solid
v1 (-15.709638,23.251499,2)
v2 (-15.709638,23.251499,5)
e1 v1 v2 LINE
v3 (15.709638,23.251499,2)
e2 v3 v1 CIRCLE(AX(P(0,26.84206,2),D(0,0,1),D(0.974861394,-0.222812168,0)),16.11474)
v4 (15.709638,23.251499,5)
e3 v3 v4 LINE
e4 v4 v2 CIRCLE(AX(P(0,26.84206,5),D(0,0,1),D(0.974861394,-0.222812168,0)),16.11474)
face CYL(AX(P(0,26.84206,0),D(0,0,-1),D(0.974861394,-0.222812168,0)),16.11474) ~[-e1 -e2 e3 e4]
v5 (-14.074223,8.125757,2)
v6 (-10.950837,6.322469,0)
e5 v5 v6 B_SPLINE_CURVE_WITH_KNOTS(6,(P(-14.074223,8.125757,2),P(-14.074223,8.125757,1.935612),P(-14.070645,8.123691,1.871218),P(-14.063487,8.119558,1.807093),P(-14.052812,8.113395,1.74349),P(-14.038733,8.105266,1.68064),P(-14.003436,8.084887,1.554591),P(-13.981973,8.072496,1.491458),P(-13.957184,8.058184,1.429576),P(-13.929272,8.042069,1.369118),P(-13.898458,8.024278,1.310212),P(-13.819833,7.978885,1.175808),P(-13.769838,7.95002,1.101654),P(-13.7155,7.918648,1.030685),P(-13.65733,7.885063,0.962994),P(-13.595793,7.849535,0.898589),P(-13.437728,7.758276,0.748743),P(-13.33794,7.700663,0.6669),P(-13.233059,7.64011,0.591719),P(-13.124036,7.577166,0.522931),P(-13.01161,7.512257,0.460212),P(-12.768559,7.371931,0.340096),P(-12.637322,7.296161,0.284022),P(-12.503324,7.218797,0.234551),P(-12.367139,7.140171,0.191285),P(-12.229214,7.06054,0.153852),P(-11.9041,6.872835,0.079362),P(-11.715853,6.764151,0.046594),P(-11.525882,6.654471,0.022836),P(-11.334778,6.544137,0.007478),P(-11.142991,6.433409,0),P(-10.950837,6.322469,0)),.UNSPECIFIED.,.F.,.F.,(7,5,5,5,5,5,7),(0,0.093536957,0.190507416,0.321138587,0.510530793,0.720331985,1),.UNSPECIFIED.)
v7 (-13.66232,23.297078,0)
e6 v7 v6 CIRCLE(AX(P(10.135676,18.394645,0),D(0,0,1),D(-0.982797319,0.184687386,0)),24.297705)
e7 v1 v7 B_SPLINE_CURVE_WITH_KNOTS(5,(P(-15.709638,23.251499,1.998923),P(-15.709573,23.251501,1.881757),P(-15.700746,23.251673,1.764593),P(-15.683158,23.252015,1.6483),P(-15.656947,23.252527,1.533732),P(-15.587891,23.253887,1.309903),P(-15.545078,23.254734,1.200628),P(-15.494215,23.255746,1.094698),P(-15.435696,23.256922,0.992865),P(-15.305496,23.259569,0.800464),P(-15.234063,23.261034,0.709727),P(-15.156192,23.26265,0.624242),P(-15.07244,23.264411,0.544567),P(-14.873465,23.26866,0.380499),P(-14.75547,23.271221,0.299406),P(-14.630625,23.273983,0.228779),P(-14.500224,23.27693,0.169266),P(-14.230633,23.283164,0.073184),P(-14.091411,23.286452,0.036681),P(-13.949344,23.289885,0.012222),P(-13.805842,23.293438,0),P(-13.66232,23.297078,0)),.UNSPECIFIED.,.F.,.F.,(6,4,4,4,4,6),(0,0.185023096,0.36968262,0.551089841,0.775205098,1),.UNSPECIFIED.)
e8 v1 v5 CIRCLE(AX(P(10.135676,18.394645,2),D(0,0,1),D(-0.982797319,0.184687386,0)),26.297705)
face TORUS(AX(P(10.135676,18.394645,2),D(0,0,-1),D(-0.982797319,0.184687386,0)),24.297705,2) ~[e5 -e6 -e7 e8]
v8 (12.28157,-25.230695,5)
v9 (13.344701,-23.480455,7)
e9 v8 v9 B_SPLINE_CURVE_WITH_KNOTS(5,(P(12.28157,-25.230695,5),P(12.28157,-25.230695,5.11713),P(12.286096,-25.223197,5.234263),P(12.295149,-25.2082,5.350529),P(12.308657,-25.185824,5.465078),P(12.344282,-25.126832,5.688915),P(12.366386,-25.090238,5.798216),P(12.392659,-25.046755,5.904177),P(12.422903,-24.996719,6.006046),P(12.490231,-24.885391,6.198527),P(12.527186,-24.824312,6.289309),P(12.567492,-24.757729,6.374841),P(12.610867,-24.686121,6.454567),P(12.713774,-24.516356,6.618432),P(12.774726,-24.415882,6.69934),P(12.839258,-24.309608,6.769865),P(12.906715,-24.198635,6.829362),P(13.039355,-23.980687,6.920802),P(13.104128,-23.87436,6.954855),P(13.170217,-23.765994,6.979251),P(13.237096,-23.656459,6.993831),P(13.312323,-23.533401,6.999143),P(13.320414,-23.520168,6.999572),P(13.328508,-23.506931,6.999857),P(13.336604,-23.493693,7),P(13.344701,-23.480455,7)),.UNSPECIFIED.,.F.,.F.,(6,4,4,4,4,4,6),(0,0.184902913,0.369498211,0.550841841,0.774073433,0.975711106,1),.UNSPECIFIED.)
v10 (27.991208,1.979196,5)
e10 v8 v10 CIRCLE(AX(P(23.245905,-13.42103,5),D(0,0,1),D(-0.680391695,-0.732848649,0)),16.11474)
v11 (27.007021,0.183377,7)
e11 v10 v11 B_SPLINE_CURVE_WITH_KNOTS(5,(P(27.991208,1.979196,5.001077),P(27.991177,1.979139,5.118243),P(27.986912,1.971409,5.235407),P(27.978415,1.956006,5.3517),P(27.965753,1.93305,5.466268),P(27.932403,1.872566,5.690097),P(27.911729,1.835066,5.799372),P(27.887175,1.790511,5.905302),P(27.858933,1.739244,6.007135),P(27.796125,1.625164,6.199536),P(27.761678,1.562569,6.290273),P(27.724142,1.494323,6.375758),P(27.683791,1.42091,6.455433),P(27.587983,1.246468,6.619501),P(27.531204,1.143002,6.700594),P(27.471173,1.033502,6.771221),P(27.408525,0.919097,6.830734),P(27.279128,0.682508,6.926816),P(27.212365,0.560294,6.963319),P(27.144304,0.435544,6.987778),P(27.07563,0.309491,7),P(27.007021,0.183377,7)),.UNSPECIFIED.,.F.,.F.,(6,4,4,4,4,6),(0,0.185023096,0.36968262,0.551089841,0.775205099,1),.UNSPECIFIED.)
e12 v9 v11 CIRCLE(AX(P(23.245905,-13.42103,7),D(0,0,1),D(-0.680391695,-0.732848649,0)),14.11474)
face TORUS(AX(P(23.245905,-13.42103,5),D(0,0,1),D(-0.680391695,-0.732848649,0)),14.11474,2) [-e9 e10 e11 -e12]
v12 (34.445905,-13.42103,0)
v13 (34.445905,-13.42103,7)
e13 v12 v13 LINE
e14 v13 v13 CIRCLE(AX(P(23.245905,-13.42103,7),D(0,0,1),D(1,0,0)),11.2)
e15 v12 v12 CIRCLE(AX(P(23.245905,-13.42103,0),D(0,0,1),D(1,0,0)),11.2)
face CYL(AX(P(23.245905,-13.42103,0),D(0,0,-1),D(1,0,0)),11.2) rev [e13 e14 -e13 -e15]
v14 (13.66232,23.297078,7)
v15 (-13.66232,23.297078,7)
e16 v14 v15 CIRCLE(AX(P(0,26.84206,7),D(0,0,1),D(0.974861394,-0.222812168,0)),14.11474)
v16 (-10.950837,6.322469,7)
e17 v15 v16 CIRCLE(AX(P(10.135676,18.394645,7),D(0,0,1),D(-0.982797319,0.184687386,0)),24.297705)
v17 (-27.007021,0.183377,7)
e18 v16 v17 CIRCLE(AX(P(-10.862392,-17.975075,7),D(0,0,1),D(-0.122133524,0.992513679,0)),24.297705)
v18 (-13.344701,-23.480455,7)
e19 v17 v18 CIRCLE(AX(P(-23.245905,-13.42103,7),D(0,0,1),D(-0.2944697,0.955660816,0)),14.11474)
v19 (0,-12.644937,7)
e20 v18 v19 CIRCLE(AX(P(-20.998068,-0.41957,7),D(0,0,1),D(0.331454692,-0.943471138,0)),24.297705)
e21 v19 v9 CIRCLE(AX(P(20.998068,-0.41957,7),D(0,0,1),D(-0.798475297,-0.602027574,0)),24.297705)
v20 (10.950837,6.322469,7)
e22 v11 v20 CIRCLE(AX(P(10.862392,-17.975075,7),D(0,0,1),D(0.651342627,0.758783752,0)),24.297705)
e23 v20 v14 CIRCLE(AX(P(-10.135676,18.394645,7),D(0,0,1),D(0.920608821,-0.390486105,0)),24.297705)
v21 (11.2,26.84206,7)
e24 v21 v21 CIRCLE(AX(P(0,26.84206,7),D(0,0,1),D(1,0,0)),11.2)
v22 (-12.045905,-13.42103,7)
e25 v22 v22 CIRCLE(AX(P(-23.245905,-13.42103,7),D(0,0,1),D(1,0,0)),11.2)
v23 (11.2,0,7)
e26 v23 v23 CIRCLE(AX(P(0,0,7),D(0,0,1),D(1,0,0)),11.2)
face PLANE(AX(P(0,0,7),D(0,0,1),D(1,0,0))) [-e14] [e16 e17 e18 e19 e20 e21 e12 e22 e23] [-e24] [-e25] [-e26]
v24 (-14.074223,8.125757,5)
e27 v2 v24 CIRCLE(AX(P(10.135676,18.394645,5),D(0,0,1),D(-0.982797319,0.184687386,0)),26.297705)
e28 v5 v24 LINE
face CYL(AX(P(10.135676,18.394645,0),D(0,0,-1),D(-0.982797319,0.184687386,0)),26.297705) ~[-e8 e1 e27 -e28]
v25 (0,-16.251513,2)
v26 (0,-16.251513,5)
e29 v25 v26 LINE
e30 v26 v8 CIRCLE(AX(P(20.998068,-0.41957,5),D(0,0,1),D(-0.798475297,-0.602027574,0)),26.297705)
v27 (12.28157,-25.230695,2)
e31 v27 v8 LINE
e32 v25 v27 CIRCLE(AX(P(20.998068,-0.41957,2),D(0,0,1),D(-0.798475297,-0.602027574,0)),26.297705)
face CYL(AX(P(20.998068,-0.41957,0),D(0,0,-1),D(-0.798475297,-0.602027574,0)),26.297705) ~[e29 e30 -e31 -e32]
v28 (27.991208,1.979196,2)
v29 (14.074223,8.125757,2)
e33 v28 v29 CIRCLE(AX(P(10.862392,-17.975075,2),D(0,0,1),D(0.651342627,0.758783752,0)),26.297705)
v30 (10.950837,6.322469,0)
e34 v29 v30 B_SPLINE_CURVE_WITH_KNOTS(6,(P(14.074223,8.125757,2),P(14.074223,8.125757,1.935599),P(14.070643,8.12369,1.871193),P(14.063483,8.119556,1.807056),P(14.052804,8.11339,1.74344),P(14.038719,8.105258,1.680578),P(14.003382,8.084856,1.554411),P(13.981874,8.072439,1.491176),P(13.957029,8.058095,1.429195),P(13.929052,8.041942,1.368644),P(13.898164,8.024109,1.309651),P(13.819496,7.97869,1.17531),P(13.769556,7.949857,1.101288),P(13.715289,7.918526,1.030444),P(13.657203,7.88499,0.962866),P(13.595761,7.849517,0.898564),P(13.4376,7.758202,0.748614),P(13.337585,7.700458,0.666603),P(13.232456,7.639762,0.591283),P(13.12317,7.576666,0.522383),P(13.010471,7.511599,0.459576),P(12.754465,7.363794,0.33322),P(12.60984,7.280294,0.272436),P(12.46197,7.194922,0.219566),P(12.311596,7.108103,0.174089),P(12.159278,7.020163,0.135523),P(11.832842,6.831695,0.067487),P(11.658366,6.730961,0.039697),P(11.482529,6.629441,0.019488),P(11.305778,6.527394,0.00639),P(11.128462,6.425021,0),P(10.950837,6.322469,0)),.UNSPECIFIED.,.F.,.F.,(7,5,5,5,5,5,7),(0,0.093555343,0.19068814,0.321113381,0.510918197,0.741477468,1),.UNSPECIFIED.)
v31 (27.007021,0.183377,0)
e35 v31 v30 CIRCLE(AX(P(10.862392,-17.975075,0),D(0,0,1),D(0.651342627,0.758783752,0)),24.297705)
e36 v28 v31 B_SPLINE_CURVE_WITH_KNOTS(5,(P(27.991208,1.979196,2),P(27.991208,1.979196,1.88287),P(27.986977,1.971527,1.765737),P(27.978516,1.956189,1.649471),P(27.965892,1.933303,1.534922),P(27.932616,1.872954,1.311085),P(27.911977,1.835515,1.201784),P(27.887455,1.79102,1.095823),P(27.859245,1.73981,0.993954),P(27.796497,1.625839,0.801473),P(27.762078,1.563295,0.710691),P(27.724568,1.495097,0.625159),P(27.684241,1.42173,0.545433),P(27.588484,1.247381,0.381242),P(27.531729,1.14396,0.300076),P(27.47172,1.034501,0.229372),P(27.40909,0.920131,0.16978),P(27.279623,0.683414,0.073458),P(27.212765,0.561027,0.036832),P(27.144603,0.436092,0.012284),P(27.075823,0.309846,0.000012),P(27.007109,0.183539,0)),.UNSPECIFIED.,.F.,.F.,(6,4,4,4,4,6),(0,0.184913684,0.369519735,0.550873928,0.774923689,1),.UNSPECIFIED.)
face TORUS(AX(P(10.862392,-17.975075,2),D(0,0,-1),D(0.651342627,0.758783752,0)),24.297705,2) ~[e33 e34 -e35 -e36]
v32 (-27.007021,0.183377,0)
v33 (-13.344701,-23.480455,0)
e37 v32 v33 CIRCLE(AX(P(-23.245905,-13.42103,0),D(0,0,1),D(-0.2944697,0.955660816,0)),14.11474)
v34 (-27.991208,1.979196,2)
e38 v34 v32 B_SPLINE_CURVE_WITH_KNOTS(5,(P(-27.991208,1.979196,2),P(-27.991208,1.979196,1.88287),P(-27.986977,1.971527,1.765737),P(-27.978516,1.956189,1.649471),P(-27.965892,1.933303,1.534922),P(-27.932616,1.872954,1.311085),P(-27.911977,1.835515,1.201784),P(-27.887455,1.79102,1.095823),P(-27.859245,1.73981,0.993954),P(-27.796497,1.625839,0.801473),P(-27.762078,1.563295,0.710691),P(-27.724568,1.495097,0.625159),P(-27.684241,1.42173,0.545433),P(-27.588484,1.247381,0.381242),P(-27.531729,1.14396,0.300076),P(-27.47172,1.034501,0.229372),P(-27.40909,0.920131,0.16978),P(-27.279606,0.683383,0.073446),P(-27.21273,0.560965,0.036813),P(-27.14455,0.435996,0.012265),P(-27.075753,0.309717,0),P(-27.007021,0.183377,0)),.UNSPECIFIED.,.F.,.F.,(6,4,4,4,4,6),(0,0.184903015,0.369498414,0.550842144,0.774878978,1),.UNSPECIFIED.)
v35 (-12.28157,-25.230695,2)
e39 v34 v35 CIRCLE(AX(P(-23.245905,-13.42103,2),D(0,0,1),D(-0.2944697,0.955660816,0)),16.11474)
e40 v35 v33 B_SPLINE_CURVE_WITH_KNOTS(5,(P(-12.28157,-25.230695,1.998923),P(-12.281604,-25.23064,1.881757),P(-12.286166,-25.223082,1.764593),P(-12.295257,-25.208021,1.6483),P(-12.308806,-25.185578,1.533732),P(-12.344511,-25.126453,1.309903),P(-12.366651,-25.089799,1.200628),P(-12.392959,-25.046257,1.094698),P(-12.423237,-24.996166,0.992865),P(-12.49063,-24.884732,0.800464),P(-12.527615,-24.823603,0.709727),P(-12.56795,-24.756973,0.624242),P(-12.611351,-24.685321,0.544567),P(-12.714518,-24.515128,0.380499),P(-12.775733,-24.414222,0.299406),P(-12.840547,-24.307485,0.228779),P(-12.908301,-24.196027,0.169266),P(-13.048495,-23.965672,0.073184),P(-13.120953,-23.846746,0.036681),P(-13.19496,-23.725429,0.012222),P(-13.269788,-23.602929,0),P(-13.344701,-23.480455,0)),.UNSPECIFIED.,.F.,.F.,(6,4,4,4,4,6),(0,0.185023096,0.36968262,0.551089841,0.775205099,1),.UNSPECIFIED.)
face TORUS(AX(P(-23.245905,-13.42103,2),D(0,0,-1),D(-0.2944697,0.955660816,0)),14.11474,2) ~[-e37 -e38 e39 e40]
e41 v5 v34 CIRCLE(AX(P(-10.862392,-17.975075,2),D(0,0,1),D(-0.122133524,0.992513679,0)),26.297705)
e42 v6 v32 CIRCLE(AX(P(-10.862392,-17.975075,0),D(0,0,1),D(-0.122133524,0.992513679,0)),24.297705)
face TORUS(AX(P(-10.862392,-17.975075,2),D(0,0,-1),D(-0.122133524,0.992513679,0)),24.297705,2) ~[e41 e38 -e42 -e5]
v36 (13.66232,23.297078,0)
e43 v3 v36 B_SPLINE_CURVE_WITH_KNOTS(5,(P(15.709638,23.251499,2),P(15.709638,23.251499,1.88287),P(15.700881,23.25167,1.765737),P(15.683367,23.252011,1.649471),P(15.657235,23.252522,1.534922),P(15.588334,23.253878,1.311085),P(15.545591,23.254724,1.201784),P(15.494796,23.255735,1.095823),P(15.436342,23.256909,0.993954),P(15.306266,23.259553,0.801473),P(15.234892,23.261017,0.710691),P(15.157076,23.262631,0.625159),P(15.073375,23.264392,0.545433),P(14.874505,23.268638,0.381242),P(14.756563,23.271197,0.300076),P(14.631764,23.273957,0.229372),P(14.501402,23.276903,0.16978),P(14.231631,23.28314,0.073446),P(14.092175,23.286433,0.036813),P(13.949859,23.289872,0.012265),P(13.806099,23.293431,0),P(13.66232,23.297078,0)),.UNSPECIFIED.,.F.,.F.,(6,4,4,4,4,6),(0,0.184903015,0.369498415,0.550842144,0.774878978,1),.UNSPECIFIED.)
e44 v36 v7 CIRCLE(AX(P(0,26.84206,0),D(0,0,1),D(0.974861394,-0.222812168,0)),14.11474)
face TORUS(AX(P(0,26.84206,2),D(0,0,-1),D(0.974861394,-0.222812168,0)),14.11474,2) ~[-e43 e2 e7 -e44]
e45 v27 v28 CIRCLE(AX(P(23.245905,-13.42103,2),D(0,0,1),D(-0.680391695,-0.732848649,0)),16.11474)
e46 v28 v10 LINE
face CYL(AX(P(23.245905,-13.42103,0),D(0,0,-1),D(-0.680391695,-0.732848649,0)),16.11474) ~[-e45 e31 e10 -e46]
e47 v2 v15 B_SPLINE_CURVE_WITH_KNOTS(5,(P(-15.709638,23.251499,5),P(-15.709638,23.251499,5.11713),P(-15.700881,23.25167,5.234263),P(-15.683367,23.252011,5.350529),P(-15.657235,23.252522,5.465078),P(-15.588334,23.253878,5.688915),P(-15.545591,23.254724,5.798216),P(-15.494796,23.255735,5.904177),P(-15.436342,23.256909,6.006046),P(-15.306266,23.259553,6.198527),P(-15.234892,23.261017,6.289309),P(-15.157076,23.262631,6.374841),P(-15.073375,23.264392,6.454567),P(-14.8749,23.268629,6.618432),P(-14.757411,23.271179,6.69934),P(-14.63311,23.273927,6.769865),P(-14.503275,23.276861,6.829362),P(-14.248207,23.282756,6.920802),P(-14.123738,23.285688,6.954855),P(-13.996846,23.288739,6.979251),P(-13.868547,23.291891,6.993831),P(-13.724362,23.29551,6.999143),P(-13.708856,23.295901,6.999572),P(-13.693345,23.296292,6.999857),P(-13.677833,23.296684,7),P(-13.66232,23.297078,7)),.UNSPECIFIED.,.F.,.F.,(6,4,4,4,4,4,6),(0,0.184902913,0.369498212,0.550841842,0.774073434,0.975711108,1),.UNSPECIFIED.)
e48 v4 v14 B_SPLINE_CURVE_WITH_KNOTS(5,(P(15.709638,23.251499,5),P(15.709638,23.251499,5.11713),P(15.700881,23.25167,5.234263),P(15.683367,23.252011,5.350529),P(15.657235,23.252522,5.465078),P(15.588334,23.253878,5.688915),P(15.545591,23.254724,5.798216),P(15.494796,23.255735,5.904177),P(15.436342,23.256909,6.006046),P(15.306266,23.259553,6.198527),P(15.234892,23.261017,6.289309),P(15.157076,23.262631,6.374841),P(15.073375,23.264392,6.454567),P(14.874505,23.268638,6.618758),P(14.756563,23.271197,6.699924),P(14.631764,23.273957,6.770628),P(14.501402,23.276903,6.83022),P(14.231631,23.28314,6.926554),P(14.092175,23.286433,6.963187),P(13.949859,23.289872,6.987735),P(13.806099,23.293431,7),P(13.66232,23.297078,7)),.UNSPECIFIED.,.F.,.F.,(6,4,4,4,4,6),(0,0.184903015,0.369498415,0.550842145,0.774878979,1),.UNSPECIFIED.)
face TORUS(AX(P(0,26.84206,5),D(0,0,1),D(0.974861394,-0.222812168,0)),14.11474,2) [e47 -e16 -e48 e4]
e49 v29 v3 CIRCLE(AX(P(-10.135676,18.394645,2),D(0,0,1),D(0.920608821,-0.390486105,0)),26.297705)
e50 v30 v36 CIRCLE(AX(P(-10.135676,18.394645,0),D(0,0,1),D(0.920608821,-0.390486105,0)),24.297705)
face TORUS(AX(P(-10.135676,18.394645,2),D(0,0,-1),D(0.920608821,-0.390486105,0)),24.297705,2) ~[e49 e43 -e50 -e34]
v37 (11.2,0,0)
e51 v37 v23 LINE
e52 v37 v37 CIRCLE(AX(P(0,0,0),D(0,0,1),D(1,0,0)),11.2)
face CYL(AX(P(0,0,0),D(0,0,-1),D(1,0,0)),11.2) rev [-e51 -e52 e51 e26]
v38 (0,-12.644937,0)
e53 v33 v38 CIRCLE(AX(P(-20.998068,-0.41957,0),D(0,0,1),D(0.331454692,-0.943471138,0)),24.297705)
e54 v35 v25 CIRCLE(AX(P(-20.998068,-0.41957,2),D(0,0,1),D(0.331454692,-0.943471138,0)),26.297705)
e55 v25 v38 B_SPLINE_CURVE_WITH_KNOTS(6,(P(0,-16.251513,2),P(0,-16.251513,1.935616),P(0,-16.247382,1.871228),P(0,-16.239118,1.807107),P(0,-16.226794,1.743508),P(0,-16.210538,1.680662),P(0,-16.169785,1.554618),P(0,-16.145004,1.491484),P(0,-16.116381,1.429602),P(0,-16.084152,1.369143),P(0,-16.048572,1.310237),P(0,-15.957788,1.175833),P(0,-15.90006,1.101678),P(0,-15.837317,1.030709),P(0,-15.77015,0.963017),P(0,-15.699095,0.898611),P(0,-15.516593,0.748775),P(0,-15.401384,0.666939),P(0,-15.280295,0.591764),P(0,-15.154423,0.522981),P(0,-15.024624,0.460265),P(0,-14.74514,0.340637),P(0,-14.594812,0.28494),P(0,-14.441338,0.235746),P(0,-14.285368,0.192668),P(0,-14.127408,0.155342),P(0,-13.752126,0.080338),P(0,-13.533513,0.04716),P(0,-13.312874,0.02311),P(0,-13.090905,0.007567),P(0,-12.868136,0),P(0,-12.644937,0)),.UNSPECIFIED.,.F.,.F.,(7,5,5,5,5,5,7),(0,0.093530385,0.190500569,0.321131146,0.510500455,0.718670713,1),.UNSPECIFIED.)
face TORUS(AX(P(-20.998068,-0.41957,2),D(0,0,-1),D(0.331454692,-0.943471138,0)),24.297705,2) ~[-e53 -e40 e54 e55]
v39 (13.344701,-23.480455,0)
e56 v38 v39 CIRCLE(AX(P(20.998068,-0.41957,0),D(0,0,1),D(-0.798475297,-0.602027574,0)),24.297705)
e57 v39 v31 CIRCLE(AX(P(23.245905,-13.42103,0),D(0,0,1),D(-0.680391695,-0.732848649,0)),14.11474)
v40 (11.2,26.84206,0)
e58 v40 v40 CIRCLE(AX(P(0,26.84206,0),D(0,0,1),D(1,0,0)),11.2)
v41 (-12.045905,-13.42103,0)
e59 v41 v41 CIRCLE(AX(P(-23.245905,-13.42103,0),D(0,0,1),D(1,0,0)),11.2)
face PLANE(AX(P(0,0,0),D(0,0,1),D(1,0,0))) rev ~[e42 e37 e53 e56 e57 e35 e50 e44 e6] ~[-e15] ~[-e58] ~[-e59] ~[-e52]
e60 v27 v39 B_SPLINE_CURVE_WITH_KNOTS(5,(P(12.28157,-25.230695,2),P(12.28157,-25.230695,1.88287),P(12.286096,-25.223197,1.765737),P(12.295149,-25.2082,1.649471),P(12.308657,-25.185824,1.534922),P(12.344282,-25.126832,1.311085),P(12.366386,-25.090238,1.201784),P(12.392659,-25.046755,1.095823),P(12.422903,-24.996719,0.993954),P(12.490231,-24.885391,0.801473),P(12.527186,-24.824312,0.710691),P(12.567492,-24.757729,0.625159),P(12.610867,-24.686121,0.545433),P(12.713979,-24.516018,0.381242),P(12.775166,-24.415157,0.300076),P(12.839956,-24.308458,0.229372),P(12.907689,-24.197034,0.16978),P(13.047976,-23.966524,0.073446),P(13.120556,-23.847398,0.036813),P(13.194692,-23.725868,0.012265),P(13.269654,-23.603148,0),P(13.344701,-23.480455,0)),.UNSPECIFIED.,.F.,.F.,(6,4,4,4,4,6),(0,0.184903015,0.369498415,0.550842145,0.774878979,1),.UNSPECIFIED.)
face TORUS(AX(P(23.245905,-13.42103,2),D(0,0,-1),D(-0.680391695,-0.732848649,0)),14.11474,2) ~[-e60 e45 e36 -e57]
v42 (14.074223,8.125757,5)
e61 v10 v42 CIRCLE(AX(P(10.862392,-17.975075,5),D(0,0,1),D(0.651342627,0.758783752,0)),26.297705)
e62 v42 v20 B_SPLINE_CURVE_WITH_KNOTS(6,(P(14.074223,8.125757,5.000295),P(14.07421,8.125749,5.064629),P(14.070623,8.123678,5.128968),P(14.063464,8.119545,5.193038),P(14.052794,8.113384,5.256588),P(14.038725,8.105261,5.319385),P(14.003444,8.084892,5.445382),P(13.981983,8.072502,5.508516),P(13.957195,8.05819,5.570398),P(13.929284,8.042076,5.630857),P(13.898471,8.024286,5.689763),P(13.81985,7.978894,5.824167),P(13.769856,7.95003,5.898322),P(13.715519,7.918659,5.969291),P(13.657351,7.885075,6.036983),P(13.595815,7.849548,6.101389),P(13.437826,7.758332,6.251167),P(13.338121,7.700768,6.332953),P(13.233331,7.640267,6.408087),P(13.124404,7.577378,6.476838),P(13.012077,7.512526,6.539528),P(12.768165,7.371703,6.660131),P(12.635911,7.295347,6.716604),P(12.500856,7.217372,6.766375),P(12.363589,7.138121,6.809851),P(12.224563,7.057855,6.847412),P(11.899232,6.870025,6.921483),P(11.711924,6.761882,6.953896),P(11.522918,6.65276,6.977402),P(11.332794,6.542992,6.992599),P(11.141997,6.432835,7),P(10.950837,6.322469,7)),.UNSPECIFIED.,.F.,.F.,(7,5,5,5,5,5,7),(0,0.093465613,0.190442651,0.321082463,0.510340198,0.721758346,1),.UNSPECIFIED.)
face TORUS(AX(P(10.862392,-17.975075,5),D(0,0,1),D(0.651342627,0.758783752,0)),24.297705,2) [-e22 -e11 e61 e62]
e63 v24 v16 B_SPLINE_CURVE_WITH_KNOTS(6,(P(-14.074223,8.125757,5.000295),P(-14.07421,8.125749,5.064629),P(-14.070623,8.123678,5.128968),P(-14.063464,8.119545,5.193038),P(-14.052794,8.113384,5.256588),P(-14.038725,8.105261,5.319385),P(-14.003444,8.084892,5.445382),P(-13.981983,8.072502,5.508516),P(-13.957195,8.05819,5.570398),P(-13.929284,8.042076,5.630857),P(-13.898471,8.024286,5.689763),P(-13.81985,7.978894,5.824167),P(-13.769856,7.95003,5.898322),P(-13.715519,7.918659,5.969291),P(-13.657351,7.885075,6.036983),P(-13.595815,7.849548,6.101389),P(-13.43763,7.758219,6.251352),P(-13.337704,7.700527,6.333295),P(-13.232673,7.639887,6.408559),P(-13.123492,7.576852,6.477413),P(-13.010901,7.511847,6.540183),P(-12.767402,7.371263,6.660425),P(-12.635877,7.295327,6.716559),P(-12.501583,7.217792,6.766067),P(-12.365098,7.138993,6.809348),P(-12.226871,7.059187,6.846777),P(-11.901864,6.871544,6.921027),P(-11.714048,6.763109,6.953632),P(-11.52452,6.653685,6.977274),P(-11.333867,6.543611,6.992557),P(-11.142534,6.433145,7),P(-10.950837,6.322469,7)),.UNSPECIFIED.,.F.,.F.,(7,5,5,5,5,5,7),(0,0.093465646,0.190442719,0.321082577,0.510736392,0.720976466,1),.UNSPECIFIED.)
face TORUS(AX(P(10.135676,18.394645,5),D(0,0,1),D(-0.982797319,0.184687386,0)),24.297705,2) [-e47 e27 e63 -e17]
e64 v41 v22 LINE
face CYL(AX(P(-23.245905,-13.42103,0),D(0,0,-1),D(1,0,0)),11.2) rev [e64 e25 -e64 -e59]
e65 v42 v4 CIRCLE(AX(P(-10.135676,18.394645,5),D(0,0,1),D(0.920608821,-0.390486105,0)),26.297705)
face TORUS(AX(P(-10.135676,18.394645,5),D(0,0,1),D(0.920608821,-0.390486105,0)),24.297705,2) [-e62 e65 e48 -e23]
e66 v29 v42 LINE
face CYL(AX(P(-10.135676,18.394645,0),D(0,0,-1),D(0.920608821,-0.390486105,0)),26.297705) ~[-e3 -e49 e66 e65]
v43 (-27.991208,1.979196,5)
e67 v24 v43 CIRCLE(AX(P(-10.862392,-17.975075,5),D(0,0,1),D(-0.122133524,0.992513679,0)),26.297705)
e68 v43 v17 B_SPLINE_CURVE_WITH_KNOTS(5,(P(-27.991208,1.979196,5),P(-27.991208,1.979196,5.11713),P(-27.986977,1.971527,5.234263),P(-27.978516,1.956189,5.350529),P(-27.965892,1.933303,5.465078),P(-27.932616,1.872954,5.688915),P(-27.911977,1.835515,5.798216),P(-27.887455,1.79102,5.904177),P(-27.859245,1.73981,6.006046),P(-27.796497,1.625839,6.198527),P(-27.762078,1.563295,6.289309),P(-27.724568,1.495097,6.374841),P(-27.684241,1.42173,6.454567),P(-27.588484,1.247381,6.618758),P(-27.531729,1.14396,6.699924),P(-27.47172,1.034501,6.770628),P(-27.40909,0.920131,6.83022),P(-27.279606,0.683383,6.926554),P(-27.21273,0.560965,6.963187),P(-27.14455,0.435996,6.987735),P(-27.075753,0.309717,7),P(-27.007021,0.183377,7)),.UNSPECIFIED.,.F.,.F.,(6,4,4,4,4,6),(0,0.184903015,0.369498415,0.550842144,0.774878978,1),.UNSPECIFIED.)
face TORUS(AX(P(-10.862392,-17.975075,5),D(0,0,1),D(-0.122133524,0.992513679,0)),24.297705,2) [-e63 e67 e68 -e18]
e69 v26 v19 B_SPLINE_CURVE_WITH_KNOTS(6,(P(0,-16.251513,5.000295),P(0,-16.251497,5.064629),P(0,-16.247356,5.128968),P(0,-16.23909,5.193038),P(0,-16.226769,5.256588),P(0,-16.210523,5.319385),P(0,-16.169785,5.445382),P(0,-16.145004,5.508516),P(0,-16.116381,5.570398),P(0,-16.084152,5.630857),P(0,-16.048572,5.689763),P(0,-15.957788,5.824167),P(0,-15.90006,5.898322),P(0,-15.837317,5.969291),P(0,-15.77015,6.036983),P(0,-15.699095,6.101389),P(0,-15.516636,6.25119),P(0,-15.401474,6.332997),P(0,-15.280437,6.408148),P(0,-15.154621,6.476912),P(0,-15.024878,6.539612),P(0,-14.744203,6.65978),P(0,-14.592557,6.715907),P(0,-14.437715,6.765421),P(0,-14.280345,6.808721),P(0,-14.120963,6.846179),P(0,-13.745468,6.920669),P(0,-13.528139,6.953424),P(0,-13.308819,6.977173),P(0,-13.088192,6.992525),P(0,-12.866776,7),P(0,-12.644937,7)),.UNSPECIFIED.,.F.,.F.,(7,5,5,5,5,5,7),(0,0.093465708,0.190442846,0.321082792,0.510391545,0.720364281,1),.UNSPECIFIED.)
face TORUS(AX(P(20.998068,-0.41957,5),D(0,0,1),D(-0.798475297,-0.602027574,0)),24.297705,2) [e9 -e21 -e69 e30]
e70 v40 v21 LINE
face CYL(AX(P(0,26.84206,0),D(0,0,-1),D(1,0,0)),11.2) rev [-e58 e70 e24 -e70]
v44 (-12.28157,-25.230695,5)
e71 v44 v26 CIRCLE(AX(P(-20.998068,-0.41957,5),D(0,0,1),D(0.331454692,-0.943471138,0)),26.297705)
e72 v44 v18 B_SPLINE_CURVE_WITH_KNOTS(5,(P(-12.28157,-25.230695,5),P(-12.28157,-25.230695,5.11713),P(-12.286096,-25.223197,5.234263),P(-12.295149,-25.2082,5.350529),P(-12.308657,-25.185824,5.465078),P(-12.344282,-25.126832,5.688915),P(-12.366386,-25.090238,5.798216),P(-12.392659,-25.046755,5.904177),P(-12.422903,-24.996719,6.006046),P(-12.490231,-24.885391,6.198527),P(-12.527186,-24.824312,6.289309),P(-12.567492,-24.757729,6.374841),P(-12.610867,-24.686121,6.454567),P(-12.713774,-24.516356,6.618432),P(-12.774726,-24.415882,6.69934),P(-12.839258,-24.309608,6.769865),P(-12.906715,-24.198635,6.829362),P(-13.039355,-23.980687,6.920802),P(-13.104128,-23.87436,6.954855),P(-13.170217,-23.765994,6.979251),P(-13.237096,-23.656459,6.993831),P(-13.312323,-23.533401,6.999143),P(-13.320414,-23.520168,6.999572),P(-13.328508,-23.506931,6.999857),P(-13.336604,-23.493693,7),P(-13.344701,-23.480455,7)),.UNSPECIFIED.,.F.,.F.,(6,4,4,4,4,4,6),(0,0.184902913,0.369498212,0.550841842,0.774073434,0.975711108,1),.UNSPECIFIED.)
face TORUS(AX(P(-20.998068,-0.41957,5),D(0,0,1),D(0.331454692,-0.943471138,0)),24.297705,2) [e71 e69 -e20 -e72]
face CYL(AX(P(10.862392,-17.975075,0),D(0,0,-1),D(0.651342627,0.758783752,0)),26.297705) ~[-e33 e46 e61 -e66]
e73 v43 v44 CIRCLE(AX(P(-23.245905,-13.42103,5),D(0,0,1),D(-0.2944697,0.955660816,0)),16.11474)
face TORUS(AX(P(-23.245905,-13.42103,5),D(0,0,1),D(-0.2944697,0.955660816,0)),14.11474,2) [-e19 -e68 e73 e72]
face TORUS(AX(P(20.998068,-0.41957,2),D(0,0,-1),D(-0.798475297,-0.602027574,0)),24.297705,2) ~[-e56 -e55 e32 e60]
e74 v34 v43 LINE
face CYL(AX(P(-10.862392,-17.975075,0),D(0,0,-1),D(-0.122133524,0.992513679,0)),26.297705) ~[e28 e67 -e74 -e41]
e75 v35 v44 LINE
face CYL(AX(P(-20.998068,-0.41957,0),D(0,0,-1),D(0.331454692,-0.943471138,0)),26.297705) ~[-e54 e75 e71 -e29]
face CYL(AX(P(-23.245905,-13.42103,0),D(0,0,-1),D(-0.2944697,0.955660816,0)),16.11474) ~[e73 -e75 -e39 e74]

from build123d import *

# Parameters (mm, degrees)
F0_R     = 11.2
F1_DEPTH = 7
F3_R     = 2


# Not quite as in the source:
# - a feature of the source that left no trace in its solid (it failed there, or was rolled back) is left out


with BuildPart() as f1:
    # F0 (on Top) → F1 (new body)
    with BuildSketch(Plane.XY):
        with BuildLine():
            ThreePointArc((0, -16.2515131131), (5.4772663535, -21.648653647), (12.2815701726, -25.2306952695))
            ThreePointArc((12.2815701726, -25.2306952695), (37.2016797512, -21.4783998187), (27.9912081448, 1.9791958669))
            ThreePointArc((27.9912081448, 1.9791958669), (21.4869171927, 6.0808750181), (14.0742232059, 8.1257565566))
            ThreePointArc((14.0742232059, 8.1257565566), (16.0096508393, 15.5677786289), (15.7096379722, 23.2514994026))
            ThreePointArc((15.7096379722, 23.2514994026), (0, 42.9567996373), (-15.7096379722, 23.2514994026))
            ThreePointArc((-15.7096379722, 23.2514994026), (-16.0096508393, 15.5677786289), (-14.0742232059, 8.1257565566))
            ThreePointArc((-14.0742232059, 8.1257565566), (-21.4869171927, 6.0808750181), (-27.9912081448, 1.9791958669))
            ThreePointArc((-27.9912081448, 1.9791958669), (-37.2016797512, -21.4783998187), (-12.2815701726, -25.2306952695))
            ThreePointArc((-12.2815701726, -25.2306952695), (-5.4772663535, -21.648653647), (0, -16.2515131131))
        make_face()
        with Locations((-23.2459054754, -13.4210297838)):
            Circle(F0_R, mode=Mode.SUBTRACT)
        with Locations((23.2459054754, -13.4210297838)):
            Circle(F0_R, mode=Mode.SUBTRACT)
        Circle(F0_R, mode=Mode.SUBTRACT)
        with Locations((0, 26.8420595676)):
            Circle(F0_R, mode=Mode.SUBTRACT)
    extrude(amount=F1_DEPTH)

    # F3
    f3_edges = [f1.edges().sort_by_distance(p)[0] for p in [
        (0, 42.9568, 0),
        (21.486917, 6.080875, 0),
        (-37.20168, -21.4784, 0),
        (21.486917, 6.080875, 7),
        (0, 42.9568, 7),
        (-16.009651, 15.567779, 7),
        (-21.486917, 6.080875, 7),
        (-37.20168, -21.4784, 7),
        (-5.477266, -21.648654, 0),
        (-5.477266, -21.648654, 7),
        (5.477266, -21.648654, 0),
        (5.477266, -21.648654, 7),
        (37.20168, -21.4784, 0),
        (37.20168, -21.4784, 7),
        (16.009651, 15.567779, 0),
        (16.009651, 15.567779, 7),
        (-16.009651, 15.567779, 0),
        (-21.486917, 6.080875, 0),
    ]]
    fillet(f3_edges, radius=F3_R)


solid = f1.part
